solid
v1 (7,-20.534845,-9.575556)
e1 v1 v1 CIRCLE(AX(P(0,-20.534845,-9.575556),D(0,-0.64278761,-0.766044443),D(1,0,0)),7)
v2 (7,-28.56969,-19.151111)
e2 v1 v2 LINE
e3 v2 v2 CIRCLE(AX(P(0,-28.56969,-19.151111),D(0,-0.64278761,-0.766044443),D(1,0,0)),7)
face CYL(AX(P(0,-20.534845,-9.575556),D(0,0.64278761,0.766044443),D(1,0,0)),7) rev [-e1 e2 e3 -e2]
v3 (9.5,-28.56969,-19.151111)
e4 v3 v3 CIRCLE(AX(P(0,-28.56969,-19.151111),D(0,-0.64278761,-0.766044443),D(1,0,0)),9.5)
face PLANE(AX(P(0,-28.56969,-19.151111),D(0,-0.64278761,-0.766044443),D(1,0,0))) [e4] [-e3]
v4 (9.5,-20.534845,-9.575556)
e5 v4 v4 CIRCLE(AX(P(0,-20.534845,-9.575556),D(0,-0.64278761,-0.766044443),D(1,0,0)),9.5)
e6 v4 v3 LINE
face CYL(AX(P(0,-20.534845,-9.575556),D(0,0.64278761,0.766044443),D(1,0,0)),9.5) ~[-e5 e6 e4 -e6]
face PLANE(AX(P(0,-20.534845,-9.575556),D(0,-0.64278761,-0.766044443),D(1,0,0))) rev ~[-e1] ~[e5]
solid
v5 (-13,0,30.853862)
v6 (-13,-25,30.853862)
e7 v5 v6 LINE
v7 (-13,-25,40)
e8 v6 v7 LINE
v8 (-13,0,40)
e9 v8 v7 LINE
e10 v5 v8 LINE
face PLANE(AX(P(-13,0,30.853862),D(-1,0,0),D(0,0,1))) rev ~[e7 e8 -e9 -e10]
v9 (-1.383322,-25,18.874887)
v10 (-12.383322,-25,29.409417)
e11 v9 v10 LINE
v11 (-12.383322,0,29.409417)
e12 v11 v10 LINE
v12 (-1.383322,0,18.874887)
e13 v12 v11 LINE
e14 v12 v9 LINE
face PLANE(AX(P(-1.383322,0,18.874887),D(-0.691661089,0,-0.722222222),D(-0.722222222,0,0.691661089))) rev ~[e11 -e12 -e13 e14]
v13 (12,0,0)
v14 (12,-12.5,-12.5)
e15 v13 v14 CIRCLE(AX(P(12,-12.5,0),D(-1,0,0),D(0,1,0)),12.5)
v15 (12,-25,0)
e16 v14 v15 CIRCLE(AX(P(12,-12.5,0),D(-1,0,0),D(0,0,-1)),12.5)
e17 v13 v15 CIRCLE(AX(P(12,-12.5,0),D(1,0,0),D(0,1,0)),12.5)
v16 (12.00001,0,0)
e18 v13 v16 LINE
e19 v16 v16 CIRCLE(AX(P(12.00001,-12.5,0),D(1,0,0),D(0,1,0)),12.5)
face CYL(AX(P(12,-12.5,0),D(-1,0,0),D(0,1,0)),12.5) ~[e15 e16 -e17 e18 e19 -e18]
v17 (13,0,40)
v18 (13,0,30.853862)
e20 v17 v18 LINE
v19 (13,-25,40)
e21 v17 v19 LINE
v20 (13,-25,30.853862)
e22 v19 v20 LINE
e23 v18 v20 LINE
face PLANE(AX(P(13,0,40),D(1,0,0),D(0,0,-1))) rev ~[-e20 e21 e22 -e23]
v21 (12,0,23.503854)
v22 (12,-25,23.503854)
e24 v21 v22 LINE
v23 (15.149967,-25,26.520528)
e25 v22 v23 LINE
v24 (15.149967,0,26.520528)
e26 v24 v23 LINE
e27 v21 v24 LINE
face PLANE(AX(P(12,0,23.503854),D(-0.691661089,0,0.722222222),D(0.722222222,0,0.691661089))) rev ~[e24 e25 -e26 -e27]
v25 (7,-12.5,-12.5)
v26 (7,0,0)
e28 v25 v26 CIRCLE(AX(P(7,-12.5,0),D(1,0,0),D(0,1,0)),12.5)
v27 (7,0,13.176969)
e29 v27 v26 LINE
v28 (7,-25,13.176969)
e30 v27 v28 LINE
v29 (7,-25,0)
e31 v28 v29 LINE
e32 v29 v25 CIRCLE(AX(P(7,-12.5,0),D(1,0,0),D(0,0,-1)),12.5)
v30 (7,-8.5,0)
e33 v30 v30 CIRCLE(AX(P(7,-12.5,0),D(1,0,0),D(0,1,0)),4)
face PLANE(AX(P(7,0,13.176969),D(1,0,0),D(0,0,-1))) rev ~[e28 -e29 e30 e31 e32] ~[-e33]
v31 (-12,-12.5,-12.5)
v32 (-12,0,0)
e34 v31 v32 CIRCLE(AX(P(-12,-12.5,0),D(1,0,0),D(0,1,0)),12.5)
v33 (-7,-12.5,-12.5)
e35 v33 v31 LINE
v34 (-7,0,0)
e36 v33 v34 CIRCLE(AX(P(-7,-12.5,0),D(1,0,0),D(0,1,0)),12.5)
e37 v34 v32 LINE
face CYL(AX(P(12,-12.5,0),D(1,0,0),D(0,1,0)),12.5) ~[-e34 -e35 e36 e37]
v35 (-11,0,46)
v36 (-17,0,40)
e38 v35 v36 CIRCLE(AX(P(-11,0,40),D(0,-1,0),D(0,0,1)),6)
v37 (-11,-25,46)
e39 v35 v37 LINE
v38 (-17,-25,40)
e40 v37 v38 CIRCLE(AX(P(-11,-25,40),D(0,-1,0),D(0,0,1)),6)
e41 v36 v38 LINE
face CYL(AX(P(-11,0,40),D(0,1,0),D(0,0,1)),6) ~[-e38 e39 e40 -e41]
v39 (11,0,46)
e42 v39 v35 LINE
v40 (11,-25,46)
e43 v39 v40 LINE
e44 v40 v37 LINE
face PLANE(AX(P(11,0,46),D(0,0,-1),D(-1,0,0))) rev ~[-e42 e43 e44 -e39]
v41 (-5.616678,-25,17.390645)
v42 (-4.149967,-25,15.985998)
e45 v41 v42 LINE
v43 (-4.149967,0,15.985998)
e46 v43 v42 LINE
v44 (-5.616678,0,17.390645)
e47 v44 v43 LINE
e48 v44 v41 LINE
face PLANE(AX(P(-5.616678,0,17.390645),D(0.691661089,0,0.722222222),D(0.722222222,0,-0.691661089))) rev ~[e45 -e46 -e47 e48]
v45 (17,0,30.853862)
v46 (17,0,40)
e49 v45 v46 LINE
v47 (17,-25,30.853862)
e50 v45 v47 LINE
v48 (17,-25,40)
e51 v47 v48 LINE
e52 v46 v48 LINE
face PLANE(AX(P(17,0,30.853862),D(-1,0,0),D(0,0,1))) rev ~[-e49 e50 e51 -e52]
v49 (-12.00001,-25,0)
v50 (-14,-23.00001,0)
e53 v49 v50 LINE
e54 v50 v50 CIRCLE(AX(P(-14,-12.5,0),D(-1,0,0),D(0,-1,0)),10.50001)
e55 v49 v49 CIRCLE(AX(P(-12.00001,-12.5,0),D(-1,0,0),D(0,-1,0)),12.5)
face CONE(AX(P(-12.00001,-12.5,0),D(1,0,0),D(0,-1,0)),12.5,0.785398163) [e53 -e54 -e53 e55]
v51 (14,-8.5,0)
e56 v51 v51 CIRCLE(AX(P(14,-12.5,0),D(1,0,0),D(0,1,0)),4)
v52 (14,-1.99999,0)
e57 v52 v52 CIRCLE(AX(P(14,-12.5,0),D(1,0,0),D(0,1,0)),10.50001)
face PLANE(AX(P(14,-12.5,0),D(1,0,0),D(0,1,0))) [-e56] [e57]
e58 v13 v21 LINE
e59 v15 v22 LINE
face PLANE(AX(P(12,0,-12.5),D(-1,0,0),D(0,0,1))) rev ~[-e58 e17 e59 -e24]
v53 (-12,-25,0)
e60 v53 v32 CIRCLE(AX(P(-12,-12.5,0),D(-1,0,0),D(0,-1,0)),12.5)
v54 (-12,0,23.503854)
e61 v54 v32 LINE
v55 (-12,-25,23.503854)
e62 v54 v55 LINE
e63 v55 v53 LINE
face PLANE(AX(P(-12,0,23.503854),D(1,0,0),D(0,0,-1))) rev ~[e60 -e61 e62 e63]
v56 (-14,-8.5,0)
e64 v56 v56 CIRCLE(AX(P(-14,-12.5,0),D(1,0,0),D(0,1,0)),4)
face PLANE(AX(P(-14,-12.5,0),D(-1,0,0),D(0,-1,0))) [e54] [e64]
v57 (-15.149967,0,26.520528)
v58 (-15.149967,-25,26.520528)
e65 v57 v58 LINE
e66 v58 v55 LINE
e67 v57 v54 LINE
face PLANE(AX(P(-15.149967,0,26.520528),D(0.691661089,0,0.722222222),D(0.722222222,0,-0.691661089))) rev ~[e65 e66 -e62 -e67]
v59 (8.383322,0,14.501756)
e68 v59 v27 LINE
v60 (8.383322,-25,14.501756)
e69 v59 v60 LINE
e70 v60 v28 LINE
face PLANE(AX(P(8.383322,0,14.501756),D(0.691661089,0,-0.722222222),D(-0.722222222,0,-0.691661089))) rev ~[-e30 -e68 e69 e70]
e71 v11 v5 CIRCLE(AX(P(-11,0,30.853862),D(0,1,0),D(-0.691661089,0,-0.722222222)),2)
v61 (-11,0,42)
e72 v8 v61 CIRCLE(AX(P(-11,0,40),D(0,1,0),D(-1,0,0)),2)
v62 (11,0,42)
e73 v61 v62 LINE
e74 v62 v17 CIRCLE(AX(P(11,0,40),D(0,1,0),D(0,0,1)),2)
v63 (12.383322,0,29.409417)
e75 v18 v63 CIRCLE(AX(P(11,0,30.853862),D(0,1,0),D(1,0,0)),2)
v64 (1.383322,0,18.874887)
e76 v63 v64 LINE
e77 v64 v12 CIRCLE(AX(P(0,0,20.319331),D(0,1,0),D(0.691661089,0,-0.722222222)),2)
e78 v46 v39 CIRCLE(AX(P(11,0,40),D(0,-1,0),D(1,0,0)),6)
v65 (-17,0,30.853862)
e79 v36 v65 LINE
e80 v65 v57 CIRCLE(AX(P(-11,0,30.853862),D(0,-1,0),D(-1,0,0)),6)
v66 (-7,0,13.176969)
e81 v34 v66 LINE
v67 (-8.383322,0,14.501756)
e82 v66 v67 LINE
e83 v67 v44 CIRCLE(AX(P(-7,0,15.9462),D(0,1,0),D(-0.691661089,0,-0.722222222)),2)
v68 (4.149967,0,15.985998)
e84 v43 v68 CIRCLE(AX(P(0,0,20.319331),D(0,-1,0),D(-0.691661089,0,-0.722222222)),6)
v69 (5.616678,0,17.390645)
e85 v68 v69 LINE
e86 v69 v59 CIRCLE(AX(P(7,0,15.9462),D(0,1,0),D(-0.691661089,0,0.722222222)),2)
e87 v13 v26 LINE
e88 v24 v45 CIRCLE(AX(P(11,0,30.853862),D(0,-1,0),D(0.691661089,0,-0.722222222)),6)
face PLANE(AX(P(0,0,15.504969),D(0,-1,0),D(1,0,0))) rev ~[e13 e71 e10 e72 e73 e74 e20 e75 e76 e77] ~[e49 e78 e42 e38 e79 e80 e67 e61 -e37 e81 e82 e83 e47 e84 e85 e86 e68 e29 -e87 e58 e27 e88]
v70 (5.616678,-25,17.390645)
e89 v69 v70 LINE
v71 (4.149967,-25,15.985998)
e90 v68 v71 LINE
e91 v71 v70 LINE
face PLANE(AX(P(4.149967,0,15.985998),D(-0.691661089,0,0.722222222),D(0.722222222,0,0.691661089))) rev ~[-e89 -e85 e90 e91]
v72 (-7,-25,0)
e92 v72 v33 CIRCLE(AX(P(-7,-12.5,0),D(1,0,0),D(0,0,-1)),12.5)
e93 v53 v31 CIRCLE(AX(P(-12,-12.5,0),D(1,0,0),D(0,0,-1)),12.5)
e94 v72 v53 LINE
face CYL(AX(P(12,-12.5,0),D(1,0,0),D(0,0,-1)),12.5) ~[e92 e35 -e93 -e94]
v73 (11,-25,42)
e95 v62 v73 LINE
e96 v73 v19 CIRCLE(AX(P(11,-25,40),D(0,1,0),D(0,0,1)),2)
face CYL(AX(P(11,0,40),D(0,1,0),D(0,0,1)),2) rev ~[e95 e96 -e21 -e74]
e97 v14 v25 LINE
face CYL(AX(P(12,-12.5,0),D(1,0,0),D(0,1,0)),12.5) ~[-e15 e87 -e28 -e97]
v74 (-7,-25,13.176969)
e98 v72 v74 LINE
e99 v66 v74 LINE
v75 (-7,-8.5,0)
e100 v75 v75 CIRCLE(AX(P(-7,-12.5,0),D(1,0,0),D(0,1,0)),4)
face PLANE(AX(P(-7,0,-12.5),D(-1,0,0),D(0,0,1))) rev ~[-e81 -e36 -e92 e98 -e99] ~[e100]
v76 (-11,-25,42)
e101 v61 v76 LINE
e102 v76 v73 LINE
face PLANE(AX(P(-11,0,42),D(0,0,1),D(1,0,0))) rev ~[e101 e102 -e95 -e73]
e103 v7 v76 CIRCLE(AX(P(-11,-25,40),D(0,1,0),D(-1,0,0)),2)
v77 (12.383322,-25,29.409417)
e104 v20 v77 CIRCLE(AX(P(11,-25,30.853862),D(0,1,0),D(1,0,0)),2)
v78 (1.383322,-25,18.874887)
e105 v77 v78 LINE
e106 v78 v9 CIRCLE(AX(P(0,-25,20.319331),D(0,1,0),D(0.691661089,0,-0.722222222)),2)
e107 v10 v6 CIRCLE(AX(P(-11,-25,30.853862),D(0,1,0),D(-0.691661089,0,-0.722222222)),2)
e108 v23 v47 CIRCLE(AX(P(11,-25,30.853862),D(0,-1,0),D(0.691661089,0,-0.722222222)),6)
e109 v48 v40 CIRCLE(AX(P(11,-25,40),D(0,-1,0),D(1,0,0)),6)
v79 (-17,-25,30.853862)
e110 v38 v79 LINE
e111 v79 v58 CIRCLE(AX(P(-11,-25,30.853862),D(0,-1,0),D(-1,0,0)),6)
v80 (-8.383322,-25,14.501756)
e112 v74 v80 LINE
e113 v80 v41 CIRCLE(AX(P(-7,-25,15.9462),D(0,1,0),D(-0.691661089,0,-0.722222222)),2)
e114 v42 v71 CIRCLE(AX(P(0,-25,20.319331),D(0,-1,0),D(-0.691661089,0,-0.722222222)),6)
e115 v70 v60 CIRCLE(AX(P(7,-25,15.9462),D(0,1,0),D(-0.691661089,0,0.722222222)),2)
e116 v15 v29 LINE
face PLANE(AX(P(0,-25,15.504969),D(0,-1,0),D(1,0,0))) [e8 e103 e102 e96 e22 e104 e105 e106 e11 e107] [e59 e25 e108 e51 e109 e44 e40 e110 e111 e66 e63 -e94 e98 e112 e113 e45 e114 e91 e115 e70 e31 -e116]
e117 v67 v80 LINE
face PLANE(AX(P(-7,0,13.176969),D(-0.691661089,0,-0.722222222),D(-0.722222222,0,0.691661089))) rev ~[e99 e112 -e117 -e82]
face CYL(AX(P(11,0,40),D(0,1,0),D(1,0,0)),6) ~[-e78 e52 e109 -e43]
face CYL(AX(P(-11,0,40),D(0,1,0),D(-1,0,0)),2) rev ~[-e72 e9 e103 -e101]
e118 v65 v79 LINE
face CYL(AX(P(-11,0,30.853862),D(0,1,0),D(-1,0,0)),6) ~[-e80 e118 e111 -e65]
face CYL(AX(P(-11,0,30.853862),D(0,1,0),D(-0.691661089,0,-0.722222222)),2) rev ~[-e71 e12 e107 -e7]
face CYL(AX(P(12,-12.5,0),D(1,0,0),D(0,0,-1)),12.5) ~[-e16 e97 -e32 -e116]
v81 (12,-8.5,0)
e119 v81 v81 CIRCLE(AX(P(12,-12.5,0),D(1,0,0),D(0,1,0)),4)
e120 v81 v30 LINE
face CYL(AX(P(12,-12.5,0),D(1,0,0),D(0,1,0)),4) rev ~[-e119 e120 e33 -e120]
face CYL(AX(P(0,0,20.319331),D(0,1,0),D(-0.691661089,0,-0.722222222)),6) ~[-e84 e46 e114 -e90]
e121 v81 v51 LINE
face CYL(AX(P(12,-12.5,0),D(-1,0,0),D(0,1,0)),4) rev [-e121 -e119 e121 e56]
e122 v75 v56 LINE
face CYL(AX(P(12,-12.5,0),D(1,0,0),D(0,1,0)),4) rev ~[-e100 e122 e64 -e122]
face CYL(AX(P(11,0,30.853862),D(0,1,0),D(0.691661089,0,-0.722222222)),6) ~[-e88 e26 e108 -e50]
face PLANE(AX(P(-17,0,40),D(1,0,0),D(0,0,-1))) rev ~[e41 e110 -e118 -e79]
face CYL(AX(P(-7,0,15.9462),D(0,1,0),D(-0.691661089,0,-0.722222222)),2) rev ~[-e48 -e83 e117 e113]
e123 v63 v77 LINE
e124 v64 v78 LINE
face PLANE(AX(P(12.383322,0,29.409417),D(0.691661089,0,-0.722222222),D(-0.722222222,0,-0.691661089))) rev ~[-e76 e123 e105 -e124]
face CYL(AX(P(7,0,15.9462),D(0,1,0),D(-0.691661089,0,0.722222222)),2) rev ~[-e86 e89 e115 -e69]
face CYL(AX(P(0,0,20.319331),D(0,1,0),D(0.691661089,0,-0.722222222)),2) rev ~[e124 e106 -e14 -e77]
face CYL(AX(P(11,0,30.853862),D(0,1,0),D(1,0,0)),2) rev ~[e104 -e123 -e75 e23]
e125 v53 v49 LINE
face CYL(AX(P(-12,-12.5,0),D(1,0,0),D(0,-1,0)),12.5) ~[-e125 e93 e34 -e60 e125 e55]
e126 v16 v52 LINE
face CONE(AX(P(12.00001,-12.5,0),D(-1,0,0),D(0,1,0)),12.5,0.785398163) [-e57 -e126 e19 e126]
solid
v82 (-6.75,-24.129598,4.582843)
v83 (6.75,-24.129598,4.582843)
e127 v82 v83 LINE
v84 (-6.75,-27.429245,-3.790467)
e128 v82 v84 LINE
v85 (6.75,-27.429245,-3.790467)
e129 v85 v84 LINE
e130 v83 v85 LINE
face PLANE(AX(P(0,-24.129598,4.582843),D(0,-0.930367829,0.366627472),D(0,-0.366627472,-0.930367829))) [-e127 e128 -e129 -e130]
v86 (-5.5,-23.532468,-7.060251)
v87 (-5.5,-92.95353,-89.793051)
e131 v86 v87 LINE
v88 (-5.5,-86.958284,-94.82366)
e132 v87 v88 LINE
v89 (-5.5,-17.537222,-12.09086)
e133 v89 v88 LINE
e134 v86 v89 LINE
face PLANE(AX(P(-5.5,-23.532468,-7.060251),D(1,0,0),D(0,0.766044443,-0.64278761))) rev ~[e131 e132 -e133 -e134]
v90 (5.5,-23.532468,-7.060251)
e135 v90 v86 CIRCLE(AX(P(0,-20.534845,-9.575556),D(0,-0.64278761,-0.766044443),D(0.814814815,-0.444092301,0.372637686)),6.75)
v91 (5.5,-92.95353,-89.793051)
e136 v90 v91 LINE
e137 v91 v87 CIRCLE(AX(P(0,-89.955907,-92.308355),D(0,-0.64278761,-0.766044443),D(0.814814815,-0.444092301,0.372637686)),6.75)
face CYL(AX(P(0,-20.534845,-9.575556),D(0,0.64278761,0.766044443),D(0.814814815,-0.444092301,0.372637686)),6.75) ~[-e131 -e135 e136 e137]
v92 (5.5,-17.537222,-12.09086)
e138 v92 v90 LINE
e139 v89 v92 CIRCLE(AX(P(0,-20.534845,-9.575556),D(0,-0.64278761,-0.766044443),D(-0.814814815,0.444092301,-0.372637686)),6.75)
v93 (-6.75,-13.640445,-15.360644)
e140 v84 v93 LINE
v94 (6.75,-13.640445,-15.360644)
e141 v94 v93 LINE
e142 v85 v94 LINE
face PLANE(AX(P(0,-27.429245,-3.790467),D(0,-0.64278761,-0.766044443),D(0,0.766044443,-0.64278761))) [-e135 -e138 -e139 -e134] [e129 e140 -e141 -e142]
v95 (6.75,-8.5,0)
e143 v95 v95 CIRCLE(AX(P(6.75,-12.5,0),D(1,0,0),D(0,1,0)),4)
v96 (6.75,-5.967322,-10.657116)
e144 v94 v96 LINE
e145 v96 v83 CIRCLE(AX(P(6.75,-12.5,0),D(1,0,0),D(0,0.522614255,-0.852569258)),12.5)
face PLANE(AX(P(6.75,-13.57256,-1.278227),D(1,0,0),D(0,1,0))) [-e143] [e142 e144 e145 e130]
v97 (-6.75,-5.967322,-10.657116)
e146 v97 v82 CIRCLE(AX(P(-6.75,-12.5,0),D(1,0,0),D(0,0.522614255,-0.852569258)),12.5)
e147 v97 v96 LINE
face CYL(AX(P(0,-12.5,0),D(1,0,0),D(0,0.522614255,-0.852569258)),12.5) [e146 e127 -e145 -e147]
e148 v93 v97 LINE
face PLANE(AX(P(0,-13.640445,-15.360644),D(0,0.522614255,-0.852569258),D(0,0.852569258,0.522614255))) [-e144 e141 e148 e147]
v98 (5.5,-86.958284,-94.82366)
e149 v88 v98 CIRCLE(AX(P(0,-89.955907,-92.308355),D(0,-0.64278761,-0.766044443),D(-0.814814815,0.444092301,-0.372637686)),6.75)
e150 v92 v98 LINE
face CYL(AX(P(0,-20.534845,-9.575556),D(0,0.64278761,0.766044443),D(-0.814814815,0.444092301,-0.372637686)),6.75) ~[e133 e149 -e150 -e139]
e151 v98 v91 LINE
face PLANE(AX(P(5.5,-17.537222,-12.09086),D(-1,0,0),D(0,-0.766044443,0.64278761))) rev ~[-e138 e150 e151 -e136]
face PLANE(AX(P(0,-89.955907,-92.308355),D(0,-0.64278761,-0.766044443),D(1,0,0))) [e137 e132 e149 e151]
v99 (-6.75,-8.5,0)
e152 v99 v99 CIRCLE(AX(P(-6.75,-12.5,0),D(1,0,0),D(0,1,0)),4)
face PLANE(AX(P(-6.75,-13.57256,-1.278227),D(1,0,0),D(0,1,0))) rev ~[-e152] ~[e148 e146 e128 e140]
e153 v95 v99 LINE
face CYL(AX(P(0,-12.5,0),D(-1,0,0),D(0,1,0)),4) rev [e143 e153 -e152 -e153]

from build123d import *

# Parameters (mm, degrees)
F1_DEPTH  = 25
F3_DEPTH  = 25
F2_R      = 12.5
F2_R_2    = 4
F4_DEPTH  = 2
F5_SIZE   = 1.99999
F6_R      = 12.5
F7_DEPTH  = 2
F8_SIZE   = 1.99999
F9_DEPTH  = 30
F10_R     = 4
F11_DEPTH = 6.75
F13_DEPTH = 108
F12_R     = 9.5
F12_R_2   = 7
F14_DEPTH = 12.5


# Not quite as in the source:
# - a fillet or chamfer is up to 0.001 mm smaller than in the source, because OpenCascade refuses the exact size


with BuildPart() as f1:
    # F0 (on Front) → F1 (new body)
    with BuildSketch(Plane.XZ):
        with BuildLine():
            ThreePointArc((-17, 30.8538616003), (-16.5181427671, 28.4979964934), (-15.1499665327, 26.520528267))
            Line((-15.1499665327, 26.520528267), (-12, 23.5038538771))
            Line((-12, 23.5038538771), (-12, -12.5))
            Line((-12, -12.5), (-7, -12.5))
            Line((-7, -12.5), (-7, 13.1769694163))
            Line((-7, 13.1769694163), (-8.3833221776, 14.5017557411))
            ThreePointArc((-8.3833221776, 14.5017557411), (-8.4444444444, 17.3295223631), (-5.6166778224, 17.39064463))
            Line((-5.6166778224, 17.39064463), (-4.1499665327, 15.9859978379))
            ThreePointArc((-4.1499665327, 15.9859978379), (0, 14.3193311712), (4.1499665327, 15.9859978379))
            Line((4.1499665327, 15.9859978379), (5.6166778224, 17.39064463))
            ThreePointArc((5.6166778224, 17.39064463), (8.4444444444, 17.3295223631), (8.3833221776, 14.5017557411))
            Line((8.3833221776, 14.5017557411), (7, 13.1769694163))
            Line((7, 13.1769694163), (7, -12.5))
            Line((7, -12.5), (12, -12.5))
            Line((12, -12.5), (12, 23.5038538771))
            Line((12, 23.5038538771), (15.1499665327, 26.520528267))
            ThreePointArc((15.1499665327, 26.520528267), (16.5181427671, 28.4979964934), (17, 30.8538616003))
            Line((17, 30.8538616003), (17, 40))
            ThreePointArc((17, 40), (15.2426406871, 44.2426406871), (11, 46))
            Line((11, 46), (0, 46))
            Line((0, 46), (-11, 46))
            ThreePointArc((-11, 46), (-15.2426406871, 44.2426406871), (-17, 40))
            Line((-17, 40), (-17, 30.8538616003))
        make_face()
        with BuildLine():
            Line((-11, 42), (0, 42))
            Line((0, 42), (11, 42))
            ThreePointArc((11, 42), (12.4142135624, 41.4142135624), (13, 40))
            Line((13, 40), (13, 30.8538616003))
            ThreePointArc((13, 30.8538616003), (12.8393809224, 30.0685732313), (12.3833221776, 29.4094171559))
            Line((12.3833221776, 29.4094171559), (1.3833221776, 18.8748867268))
            ThreePointArc((1.3833221776, 18.8748867268), (0, 18.3193311712), (-1.3833221776, 18.8748867268))
            Line((-1.3833221776, 18.8748867268), (-12.3833221776, 29.4094171559))
            ThreePointArc((-12.3833221776, 29.4094171559), (-12.8393809224, 30.0685732313), (-13, 30.8538616003))
            Line((-13, 30.8538616003), (-13, 40))
            ThreePointArc((-13, 40), (-12.4142135624, 41.4142135624), (-11, 42))
        make_face(mode=Mode.SUBTRACT)
    extrude(amount=F1_DEPTH)

    # F2 (on face) → F3 (cut)
    with BuildSketch(Plane.YZ.offset(12)):
        with BuildLine():
            ThreePointArc((-12.5, -12.5), (-21.3388347734, -8.8388347563), (-25, 2.41e-08))
            Line((-25, 2.41e-08), (-25, -12.5))
            Line((-25, -12.5), (-12.5, -12.5))
        make_face()
        with BuildLine():
            Line((0, -12.5), (0, 0))
            ThreePointArc((0, 0), (-3.6611652352, -8.8388347648), (-12.5, -12.5))
            Line((-12.5, -12.5), (0, -12.5))
        make_face()
    extrude(amount=-F3_DEPTH, mode=Mode.SUBTRACT)

    # F2 (on face) → F4 (join)
    with BuildSketch(Plane.YZ.offset(12)):
        with Locations((-12.5, 0)):
            Circle(F2_R)
        with Locations((-12.5, 0)):
            Circle(F2_R_2, mode=Mode.SUBTRACT)
    extrude(amount=F4_DEPTH)

    # F5 (size 2 in the source; OpenCascade refuses exactly that, so slightly less here)
    f5_edges = [f1.edges().sort_by_distance(p)[0] for p in [
        (14, -25, 0),
    ]]
    chamfer(f5_edges, length=F5_SIZE)

    # F6 (on face) → F7 (join)
    with BuildSketch(Plane(origin=(-12, 0, 0), x_dir=(0, -1, 0), z_dir=(-1, 0, 0))):
        with Locations((12.5, 0)):
            Circle(F6_R)
    extrude(amount=F7_DEPTH)

    # F8 (size 2 in the source; OpenCascade refuses exactly that, so slightly less here)
    f8_edges = [f1.edges().sort_by_distance(p)[0] for p in [
        (-14, 0, 0),
    ]]
    chamfer(f8_edges, length=F8_SIZE)

    # F2 (on face) → F9 (cut)
    with BuildSketch(Plane.YZ.offset(12)):
        with Locations((-12.5, 0)):
            Circle(F2_R_2)
    extrude(amount=-F9_DEPTH, mode=Mode.SUBTRACT)


with BuildPart() as f11:
    # F10 (on Right) → F11 (new body, symmetric)
    with BuildSketch(Plane.YZ):
        with BuildLine():
            Line((-13.640445133, -15.3606440262), (-5.9673218086, -10.6571157284))
            ThreePointArc((-5.9673218086, -10.6571157284), (-4.4651548789, 9.575555539), (-24.1295978573, 4.5828434054))
            Line((-24.1295978573, 4.5828434054), (-27.4292451092, -3.7904670518))
            Line((-27.4292451092, -3.7904670518), (-20.5348451211, -9.575555539))
            Line((-20.5348451211, -9.575555539), (-13.640445133, -15.3606440262))
        make_face()
        with Locations((-12.5, 0)):
            Circle(F10_R, mode=Mode.SUBTRACT)
    extrude(amount=F11_DEPTH, both=True)

    # F12 (on face) → F13 (join)
    with BuildSketch(Plane(origin=(0, -13.1995440107, -15.7306039953), x_dir=(1, 0, 0), z_dir=(0, -0.6427876097, -0.7660444431))):
        with BuildLine():
            Line((5.5, 5.6624365784), (5.5, 13.4886744996))
            ThreePointArc((5.5, 13.4886744996), (0, 16.325555539), (-5.5, 13.4886744996))
            Line((-5.5, 13.4886744996), (-5.5, 5.6624365784))
            ThreePointArc((-5.5, 5.6624365784), (0, 2.825555539), (5.5, 5.6624365784))
        make_face()
    extrude(amount=F13_DEPTH)


with BuildPart() as f14:
    # F12 (on face) → F14 (new body)
    with BuildSketch(Plane(origin=(0, -13.1995440107, -15.7306039953), x_dir=(1, 0, 0), z_dir=(0, -0.6427876097, -0.7660444431))):
        with Locations((0, 9.575555539)):
            Circle(F12_R)
        with Locations((0, 9.575555539)):
            Circle(F12_R_2, mode=Mode.SUBTRACT)
    extrude(amount=F14_DEPTH)


solid = Compound([f1.part, f11.part, f14.part])
